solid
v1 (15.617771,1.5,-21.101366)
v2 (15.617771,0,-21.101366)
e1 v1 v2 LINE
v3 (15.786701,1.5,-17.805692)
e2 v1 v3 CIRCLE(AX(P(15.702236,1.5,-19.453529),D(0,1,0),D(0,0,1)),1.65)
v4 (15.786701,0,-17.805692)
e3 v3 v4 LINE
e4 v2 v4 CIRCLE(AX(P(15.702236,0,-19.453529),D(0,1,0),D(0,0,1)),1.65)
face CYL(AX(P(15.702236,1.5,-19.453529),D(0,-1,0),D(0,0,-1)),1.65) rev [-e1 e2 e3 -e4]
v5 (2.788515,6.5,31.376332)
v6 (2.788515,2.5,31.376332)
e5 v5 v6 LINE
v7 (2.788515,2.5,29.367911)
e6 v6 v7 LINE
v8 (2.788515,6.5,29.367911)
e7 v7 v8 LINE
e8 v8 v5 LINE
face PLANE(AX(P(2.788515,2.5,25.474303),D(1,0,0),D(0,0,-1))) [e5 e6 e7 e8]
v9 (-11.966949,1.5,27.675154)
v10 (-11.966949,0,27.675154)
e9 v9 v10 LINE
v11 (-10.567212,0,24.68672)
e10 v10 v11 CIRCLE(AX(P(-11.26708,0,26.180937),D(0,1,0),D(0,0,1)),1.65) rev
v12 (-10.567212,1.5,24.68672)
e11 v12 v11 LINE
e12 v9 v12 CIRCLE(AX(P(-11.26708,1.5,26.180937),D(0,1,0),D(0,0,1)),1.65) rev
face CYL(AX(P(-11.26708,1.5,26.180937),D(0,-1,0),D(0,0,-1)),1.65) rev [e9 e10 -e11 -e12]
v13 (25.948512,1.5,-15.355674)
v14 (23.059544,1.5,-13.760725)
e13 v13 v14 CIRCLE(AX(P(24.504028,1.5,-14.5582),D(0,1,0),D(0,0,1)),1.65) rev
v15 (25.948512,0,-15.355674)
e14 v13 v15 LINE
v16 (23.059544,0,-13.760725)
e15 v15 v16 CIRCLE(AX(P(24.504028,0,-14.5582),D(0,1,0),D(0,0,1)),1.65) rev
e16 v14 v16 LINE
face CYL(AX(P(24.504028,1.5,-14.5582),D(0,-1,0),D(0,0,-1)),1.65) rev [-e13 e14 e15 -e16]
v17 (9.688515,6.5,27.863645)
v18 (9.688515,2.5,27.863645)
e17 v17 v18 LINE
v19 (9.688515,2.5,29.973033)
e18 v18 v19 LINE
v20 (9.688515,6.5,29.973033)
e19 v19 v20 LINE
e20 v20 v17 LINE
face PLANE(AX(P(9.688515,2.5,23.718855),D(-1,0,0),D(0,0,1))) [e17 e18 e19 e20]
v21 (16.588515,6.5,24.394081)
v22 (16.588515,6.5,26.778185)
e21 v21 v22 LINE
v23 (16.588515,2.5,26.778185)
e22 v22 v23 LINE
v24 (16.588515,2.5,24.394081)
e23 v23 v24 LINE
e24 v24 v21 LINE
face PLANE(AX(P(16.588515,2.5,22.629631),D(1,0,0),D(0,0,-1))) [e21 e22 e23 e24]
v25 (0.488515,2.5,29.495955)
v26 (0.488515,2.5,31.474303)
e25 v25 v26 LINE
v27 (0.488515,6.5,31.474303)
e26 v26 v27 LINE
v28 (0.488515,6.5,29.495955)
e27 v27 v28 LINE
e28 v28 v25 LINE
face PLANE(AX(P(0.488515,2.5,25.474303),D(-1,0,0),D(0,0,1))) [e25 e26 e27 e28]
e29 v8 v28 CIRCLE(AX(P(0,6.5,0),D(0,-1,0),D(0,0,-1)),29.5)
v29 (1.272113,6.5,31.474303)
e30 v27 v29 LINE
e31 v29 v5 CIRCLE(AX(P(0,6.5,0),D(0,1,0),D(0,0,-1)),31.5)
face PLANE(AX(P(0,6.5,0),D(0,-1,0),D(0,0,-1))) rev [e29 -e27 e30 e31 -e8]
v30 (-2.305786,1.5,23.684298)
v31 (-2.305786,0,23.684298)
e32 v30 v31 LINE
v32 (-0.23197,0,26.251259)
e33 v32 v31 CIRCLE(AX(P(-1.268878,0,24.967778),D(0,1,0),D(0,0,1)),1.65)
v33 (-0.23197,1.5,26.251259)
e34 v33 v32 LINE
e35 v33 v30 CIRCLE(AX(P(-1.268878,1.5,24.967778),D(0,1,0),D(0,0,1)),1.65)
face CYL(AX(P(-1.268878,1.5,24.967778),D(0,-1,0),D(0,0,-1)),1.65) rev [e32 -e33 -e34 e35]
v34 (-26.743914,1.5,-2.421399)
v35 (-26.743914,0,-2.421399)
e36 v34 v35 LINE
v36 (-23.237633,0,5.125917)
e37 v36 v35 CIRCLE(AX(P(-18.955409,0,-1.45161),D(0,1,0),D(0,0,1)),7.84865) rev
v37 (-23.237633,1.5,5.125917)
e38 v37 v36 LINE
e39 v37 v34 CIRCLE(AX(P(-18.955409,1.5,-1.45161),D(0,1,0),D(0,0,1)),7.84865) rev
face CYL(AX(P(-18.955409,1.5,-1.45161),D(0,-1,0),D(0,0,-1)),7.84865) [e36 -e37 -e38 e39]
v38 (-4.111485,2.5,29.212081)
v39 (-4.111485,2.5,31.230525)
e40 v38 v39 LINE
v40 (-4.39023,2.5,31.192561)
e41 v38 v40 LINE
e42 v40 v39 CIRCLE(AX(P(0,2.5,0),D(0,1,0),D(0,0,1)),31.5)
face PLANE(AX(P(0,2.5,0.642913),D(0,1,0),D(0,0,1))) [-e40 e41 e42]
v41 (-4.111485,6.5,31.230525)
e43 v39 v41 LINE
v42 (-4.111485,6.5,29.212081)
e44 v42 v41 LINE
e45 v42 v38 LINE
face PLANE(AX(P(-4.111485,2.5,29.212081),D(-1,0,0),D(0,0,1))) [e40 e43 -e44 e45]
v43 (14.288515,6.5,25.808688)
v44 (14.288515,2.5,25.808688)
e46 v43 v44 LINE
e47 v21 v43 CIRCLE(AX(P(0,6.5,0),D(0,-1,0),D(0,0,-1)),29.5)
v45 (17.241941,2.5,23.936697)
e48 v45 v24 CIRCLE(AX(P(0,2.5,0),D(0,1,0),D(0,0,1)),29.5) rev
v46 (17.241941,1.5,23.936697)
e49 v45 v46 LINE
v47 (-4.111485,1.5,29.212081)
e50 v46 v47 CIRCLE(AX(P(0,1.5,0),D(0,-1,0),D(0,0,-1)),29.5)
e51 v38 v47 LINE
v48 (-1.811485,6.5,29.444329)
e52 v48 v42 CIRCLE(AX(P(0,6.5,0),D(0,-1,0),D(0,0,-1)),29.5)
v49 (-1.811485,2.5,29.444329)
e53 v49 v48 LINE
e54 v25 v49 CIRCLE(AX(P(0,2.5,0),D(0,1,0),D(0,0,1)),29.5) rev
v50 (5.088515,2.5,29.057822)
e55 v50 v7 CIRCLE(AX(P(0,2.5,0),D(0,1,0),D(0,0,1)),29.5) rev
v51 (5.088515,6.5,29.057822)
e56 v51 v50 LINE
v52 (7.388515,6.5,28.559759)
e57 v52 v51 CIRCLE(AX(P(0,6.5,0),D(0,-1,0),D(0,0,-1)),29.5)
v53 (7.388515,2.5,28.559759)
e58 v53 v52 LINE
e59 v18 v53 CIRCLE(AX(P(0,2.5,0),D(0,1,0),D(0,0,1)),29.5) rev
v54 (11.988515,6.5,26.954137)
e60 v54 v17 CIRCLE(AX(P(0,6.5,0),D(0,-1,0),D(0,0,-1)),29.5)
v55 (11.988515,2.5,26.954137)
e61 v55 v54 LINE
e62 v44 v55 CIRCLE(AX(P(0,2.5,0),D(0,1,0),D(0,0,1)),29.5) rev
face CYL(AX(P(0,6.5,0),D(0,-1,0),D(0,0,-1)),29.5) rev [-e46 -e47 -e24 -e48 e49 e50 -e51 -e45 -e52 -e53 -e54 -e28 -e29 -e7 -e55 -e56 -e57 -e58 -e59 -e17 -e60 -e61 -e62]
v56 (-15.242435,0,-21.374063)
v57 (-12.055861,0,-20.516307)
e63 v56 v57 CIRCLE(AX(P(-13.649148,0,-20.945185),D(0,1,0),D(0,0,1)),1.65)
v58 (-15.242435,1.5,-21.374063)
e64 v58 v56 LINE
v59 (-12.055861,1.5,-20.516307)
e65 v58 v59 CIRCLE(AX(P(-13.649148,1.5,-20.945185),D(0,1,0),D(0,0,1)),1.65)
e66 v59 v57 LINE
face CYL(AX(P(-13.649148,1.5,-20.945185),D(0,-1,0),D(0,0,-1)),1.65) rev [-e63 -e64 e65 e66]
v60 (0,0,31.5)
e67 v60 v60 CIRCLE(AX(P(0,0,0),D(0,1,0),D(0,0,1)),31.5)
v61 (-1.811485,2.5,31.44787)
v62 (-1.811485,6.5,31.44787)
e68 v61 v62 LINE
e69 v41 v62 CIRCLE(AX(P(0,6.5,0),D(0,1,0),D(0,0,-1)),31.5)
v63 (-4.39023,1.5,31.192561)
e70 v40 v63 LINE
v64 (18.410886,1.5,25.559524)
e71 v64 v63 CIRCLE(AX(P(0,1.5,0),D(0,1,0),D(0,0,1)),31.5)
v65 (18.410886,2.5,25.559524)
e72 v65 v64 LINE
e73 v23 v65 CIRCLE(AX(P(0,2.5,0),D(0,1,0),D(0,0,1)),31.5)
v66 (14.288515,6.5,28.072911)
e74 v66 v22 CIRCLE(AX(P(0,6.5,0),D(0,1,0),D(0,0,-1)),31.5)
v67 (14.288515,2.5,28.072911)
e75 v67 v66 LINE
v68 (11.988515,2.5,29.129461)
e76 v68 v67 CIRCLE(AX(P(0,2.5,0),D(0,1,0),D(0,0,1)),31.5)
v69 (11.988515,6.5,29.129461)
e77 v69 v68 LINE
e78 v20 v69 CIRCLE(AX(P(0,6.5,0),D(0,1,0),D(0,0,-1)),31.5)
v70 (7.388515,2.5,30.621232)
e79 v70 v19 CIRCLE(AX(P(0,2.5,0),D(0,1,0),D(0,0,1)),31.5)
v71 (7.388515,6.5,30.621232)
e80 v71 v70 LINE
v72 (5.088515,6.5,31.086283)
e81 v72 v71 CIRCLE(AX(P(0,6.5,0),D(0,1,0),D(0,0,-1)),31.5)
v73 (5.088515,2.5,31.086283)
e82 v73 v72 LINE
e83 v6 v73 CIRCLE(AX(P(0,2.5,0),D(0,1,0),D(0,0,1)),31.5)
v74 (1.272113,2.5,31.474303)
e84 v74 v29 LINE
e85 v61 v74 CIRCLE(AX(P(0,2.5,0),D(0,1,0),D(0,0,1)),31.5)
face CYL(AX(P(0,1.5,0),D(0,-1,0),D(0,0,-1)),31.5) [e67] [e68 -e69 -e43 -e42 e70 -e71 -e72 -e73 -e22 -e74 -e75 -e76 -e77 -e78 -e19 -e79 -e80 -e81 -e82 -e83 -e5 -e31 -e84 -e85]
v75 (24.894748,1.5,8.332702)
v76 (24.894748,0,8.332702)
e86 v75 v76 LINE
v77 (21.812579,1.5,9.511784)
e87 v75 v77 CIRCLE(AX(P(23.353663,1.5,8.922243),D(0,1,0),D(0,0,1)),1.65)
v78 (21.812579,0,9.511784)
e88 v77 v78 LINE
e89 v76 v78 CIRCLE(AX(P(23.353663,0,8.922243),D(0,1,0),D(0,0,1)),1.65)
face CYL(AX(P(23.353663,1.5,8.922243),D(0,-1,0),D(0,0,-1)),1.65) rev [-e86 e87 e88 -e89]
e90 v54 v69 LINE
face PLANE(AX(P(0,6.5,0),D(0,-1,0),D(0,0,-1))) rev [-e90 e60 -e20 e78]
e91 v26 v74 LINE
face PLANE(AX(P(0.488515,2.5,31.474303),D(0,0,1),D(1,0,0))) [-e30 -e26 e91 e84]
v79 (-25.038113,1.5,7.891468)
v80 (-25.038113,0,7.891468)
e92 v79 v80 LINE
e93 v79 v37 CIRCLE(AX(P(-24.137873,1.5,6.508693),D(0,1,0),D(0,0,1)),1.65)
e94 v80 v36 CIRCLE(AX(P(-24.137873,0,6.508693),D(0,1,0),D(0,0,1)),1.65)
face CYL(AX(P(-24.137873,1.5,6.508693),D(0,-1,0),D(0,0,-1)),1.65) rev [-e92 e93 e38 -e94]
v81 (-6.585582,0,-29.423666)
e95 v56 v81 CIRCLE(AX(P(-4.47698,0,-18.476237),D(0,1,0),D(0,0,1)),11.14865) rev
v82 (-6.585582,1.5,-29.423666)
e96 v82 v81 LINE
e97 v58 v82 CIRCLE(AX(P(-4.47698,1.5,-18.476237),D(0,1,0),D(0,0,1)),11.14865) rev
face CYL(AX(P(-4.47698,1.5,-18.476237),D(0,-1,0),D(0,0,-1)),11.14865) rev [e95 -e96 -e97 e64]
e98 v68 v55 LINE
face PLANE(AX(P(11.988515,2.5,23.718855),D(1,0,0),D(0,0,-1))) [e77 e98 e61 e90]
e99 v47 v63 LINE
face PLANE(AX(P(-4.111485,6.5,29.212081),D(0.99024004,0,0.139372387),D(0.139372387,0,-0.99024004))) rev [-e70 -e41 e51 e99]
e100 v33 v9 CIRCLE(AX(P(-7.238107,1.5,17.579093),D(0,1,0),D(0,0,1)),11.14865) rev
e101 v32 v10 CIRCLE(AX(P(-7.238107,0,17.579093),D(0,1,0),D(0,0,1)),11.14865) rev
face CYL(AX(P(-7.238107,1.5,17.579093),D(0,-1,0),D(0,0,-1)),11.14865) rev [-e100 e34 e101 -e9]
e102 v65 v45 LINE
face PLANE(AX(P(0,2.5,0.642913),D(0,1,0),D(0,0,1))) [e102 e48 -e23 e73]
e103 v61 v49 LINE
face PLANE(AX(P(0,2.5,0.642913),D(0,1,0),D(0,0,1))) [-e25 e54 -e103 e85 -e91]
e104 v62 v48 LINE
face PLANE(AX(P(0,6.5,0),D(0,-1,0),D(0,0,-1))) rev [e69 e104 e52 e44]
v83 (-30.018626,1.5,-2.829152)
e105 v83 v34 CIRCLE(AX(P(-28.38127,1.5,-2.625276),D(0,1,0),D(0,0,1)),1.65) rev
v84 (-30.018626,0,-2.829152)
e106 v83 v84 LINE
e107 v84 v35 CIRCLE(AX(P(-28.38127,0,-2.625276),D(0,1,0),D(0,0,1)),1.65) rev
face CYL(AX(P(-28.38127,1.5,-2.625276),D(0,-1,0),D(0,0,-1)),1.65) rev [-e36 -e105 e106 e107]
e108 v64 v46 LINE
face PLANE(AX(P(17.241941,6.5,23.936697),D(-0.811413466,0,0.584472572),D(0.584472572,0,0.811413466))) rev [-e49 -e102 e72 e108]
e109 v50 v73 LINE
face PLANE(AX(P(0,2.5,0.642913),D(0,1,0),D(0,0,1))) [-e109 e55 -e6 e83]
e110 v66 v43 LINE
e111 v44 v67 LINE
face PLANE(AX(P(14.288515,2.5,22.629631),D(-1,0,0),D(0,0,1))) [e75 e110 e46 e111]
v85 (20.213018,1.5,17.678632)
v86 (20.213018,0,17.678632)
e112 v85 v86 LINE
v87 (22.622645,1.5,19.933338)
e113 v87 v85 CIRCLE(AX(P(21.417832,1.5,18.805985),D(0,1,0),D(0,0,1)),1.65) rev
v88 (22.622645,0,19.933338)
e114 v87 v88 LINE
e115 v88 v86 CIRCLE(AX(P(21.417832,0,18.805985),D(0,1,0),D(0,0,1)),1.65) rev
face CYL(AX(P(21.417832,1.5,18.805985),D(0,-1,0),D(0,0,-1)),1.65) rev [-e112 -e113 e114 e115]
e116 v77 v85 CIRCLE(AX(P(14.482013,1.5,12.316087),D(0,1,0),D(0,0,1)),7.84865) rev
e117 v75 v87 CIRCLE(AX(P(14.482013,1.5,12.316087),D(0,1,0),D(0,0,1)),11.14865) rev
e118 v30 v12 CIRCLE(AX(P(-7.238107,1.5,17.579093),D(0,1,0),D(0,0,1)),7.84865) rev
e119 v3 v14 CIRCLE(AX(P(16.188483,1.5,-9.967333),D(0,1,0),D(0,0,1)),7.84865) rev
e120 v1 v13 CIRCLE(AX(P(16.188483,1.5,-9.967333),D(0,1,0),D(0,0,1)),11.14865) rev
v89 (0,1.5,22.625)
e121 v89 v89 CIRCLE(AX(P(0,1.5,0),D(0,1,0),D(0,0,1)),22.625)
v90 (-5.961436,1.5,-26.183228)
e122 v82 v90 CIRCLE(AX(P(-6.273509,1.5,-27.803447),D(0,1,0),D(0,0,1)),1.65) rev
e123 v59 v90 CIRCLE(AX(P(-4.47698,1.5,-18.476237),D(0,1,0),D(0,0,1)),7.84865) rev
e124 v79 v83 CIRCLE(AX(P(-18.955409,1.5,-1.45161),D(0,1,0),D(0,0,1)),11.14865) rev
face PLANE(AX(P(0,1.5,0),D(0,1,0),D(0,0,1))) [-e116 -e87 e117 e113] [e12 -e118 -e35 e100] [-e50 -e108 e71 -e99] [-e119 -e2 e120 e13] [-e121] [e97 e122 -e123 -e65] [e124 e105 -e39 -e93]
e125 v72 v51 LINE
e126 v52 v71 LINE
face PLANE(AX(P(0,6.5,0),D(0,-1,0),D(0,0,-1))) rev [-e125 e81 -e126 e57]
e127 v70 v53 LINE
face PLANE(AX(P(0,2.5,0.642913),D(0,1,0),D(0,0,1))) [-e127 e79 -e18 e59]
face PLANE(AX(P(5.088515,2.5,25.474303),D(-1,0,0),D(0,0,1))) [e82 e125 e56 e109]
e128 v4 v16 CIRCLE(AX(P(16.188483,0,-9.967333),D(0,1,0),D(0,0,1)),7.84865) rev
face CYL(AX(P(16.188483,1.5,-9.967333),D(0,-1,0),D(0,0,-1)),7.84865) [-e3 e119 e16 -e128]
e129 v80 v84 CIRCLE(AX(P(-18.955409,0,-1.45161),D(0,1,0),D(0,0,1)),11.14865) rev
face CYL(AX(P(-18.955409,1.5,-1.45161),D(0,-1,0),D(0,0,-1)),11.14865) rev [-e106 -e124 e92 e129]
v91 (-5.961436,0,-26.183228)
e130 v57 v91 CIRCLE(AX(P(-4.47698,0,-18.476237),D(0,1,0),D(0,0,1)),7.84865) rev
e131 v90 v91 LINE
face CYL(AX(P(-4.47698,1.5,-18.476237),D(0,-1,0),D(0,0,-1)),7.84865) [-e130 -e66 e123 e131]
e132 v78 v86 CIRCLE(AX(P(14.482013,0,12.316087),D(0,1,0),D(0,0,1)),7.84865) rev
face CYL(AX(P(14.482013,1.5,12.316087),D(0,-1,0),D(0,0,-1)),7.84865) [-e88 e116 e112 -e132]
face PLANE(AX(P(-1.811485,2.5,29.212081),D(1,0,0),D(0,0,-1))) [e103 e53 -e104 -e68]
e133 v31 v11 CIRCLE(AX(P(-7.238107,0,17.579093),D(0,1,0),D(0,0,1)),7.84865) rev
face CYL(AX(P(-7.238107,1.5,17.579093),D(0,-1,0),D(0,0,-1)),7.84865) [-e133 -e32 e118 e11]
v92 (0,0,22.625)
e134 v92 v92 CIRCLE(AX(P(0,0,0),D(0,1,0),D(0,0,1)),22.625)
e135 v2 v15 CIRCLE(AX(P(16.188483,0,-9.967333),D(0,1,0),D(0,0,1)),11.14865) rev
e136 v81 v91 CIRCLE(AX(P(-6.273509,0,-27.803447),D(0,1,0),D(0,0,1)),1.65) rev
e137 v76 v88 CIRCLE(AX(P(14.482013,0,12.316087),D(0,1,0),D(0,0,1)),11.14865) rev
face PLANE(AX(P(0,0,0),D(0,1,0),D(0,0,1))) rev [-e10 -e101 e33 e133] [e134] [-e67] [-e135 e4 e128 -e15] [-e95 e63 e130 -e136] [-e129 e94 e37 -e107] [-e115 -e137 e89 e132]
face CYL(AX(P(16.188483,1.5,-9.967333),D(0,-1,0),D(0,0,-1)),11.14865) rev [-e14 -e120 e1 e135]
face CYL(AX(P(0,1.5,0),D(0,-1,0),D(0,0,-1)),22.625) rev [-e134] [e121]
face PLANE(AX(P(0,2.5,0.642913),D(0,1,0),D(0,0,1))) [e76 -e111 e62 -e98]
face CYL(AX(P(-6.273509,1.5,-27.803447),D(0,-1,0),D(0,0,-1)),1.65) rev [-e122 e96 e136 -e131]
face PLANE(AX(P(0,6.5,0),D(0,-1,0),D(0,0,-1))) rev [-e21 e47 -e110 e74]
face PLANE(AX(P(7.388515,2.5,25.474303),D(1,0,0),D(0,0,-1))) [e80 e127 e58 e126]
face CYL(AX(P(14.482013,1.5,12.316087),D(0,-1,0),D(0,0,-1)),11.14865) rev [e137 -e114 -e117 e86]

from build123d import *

# Parameters (mm, degrees)
SKETCH1_R           = 31.5
SKETCH1_R_2         = 22.625
BOSS_EXTRUDE1_DEPTH = 1.5
BOSS_EXTRUDE2_DEPTH = 5
SKETCH5_OUTSIDE_W   = 82.866
SKETCH5_OUTSIDE_H   = 82.866
SKETCH5_OUTSIDE_W_2 = 2.3
SKETCH5_OUTSIDE_H_2 = 2.235788696
SKETCH5_OUTSIDE_H_3 = 6
SKETCH5_OUTSIDE_H_4 = 9.066972397
SKETCH5_OUTSIDE_H_5 = 8.526406287
CUT_EXTRUDE10_DEPTH = 4


with BuildPart() as part:
    # Sketch1 → Boss-Extrude1 (new body)
    with BuildSketch(Plane(origin=(0, 0, 0), x_dir=(1, 0, 0), z_dir=(0, 1, 0))):
        Circle(SKETCH1_R)
        with BuildLine():
            ThreePointArc((-10.567211754, -24.68672042), (-6.292703266, -25.370596148), (-2.305786299, -23.684297857))
            ThreePointArc((-2.305786299, -23.684297857), (0.01460205, -23.930870181), (-0.231970274, -26.251258529))
            ThreePointArc((-0.231970274, -26.251258529), (-5.895204242, -28.646568451), (-11.966948868, -27.675154125))
            ThreePointArc((-11.966948868, -27.675154125), (-12.761297164, -25.481068715), (-10.567211754, -24.68672042))
        make_face(mode=Mode.SUBTRACT)
        with BuildLine():
            ThreePointArc((-26.743914336, 2.421399453), (-26.073423039, -1.855228921), (-23.237632962, -5.125917453))
            ThreePointArc((-23.237632962, -5.125917453), (-22.755097744, -7.408932951), (-25.038113242, -7.891468169))
            ThreePointArc((-25.038113242, -7.891468169), (-29.066223891, -3.245604073), (-30.018626241, 2.829151754))
            ThreePointArc((-30.018626241, 2.829151754), (-28.177394138, 4.262631556), (-26.743914336, 2.421399453))
        make_face(mode=Mode.SUBTRACT)
        with BuildLine():
            ThreePointArc((20.213018306, -17.678631743), (22.18431854, -13.824661813), (21.812578659, -9.511783622))
            ThreePointArc((21.812578659, -9.511783622), (22.764122308, -7.381158201), (24.894747729, -8.33270185))
            ThreePointArc((24.894747729, -8.33270185), (25.422787299, -14.458948891), (22.622645099, -19.933337648))
            ThreePointArc((22.622645099, -19.933337648), (20.29047875, -20.010798092), (20.213018306, -17.678631743))
        make_face(mode=Mode.SUBTRACT)
        with BuildLine():
            ThreePointArc((-12.05586069, 20.516306647), (-14.078025873, 19.351897797), (-15.242434724, 21.37406298))
            ThreePointArc((-15.242434724, 21.37406298), (-12.068710047, 26.64067482), (-6.585582445, 29.423666069))
            ThreePointArc((-6.585582445, 29.423666069), (-4.653290128, 28.115519899), (-5.961436298, 26.183227582))
            ThreePointArc((-5.961436298, 26.183227582), (-9.821558376, 24.224001618), (-12.05586069, 20.516306647))
        make_face(mode=Mode.SUBTRACT)
        Circle(SKETCH1_R_2, mode=Mode.SUBTRACT)
        with BuildLine():
            ThreePointArc((23.059544082, 13.760725128), (20.00336614, 16.826485265), (15.786701292, 17.805692285))
            ThreePointArc((15.786701292, 17.805692285), (14.05439926, 19.369063536), (15.617770512, 21.101365568))
            ThreePointArc((15.617770512, 21.101365568), (21.607350881, 19.710446595), (25.948512455, 15.35567395))
            ThreePointArc((25.948512455, 15.35567395), (25.301502679, 13.113715353), (23.059544082, 13.760725128))
        make_face(mode=Mode.SUBTRACT)
    extrude(amount=BOSS_EXTRUDE1_DEPTH)

    # Sketch2 → Boss-Extrude2 (add)
    with BuildSketch(Plane(origin=(0, 1.5, 0), x_dir=(1, 0, 0), z_dir=(0, 1, 0))):
        with BuildLine():
            Line((-4.111485424, -29.212081193), (-4.390230198, -31.192561274))
            ThreePointArc((-4.390230198, -31.192561274), (7.554963543, -30.580590672), (18.410886017, -25.559524175))
            Line((18.410886017, -25.559524175), (17.241940873, -23.936697244))
            ThreePointArc((17.241940873, -23.936697244), (7.075283318, -28.638965868), (-4.111485424, -29.212081193))
        make_face()
    extrude(amount=BOSS_EXTRUDE2_DEPTH)

    # Sketch5 outside → Cut-Extrude10 (cut)
    with BuildSketch(Plane(origin=(0, 6.5, 0), x_dir=(1, 0, 0), z_dir=(0, 1, 0))):
        Rectangle(SKETCH5_OUTSIDE_W, SKETCH5_OUTSIDE_H)
        with Locations((-2.961485424, -30.329975541)):
            Rectangle(SKETCH5_OUTSIDE_W_2, SKETCH5_OUTSIDE_H_2, mode=Mode.SUBTRACT)
        with Locations((1.638514576, -28.474302668)):
            Rectangle(SKETCH5_OUTSIDE_W_2, SKETCH5_OUTSIDE_H_3, mode=Mode.SUBTRACT)
        with Locations((6.238514576, -28.474302668)):
            Rectangle(SKETCH5_OUTSIDE_W_2, SKETCH5_OUTSIDE_H_3, mode=Mode.SUBTRACT)
        with Locations((10.838514576, -28.252340763)):
            Rectangle(SKETCH5_OUTSIDE_W_2, SKETCH5_OUTSIDE_H_4, mode=Mode.SUBTRACT)
        with Locations((15.438514576, -26.892833744)):
            Rectangle(SKETCH5_OUTSIDE_W_2, SKETCH5_OUTSIDE_H_5, mode=Mode.SUBTRACT)
    extrude(amount=-CUT_EXTRUDE10_DEPTH, mode=Mode.SUBTRACT)


solid = part.part
